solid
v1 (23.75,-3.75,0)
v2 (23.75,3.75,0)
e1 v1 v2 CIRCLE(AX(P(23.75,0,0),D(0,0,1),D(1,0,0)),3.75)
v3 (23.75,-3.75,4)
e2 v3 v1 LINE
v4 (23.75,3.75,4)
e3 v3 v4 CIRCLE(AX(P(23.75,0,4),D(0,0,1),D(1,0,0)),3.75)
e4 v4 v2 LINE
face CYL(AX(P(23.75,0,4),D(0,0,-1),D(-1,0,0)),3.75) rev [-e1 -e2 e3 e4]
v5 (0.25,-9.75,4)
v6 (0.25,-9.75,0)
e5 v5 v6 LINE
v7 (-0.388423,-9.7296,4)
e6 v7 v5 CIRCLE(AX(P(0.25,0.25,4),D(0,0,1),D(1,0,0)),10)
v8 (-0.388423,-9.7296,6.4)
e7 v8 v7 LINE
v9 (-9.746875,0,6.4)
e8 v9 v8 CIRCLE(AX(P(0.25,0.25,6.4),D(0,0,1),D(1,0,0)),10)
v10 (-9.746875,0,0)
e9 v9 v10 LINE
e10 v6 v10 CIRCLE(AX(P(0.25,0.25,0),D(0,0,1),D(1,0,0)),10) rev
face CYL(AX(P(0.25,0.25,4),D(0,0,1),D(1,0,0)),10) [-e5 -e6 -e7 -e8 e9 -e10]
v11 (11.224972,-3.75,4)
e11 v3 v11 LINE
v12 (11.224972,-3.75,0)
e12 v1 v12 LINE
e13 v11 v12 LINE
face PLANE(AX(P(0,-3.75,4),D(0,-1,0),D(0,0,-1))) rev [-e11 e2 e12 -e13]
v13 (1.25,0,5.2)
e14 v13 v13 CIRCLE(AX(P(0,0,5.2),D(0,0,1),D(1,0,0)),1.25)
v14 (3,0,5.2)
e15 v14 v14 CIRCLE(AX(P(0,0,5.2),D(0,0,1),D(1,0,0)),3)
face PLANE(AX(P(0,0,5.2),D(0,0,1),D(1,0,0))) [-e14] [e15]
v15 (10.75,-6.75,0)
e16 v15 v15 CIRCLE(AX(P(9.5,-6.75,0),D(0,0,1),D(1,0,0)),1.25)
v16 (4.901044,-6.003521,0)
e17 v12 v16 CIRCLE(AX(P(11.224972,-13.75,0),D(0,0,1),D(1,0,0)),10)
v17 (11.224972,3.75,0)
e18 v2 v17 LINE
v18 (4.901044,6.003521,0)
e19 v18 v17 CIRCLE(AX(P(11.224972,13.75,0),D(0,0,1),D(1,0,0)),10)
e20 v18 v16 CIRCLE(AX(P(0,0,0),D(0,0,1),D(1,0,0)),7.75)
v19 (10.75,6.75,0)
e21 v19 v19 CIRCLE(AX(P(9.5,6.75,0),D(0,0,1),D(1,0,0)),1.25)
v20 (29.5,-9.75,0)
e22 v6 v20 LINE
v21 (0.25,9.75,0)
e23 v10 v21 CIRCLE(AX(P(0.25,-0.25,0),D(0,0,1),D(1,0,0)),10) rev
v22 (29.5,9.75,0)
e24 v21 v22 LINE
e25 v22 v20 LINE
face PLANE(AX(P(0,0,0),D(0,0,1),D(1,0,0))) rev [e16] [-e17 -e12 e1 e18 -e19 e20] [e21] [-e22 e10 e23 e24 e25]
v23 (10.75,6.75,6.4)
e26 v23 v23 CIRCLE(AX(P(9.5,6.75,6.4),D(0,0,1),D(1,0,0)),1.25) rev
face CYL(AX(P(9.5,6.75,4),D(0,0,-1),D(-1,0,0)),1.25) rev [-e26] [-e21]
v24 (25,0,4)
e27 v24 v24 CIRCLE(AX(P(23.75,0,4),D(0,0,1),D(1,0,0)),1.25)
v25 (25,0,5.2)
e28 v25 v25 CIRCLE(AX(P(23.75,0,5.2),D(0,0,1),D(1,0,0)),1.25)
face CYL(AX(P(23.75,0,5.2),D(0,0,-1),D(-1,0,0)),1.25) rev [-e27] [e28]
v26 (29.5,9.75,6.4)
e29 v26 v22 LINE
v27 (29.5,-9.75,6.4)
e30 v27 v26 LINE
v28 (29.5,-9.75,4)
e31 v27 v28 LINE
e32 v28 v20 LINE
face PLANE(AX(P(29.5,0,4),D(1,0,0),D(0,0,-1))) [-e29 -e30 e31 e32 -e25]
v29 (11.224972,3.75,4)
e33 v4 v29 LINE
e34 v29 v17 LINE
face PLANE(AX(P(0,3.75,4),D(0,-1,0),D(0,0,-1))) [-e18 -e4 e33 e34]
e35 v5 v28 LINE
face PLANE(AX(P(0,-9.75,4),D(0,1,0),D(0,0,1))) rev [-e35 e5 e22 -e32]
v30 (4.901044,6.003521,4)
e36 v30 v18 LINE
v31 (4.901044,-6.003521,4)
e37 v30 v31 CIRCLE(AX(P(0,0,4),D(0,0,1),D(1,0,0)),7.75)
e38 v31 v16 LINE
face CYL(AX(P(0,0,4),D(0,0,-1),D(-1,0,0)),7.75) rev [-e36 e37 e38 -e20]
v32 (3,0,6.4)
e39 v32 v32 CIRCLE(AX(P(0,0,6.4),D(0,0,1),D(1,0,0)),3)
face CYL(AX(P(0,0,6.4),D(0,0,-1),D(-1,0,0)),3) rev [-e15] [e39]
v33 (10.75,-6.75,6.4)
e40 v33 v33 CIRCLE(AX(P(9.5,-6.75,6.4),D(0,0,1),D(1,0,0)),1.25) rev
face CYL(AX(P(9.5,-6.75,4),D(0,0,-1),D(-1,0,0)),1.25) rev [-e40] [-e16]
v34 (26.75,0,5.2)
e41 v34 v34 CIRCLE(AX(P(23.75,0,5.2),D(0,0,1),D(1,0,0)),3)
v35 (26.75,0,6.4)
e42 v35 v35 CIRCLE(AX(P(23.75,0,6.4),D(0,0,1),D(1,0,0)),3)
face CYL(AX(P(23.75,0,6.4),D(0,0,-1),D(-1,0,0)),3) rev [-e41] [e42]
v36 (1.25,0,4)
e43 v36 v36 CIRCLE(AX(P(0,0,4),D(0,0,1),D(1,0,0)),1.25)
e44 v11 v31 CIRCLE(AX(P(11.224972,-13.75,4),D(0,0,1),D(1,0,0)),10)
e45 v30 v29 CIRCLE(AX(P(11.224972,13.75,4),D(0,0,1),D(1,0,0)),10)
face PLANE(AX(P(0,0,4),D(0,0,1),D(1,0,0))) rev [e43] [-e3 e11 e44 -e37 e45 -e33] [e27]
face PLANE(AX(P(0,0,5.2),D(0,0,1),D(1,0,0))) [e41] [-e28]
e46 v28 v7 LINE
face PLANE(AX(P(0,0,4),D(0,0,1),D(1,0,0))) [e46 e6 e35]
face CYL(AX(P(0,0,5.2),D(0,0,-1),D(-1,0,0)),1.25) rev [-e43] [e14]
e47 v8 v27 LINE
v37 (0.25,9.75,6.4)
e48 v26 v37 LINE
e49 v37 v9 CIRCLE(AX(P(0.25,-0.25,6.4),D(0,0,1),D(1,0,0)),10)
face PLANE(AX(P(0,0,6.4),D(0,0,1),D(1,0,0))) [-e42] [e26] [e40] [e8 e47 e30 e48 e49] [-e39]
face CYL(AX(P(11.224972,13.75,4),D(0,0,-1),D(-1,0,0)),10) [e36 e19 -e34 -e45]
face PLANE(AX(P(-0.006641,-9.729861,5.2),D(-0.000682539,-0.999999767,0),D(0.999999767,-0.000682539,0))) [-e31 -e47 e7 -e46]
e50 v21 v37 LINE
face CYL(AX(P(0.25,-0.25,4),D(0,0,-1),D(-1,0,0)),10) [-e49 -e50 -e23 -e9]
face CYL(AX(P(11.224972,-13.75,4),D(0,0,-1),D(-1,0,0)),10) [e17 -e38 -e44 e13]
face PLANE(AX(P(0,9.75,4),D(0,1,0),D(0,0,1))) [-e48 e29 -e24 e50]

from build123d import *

# Parameters (mm, degrees)
SKETCH1_R           = 1.25
BOSS_EXTRUDE4_DEPTH = 4
FILLET1_R           = 10
SKETCH2_R           = 1.25
BOSS_EXTRUDE5_DEPTH = 1.2
SKETCH3_R           = 3
SKETCH3_R_2         = 1.25
BOSS_EXTRUDE6_DEPTH = 1.2


with BuildPart() as part:
    # Sketch1 → Boss-Extrude4 (new body)
    with BuildSketch(Plane.XY):
        Polygon((-9.75, 9.75), (-9.75, 0), (-9.75, -9.75), (29.5, -9.75), (29.5, -6.75), (29.5, 6.75), (29.5, 9.75), align=None)
        with Locations((9.5, -6.75)):
            Circle(SKETCH1_R, mode=Mode.SUBTRACT)
        with Locations((9.5, 6.75)):
            Circle(SKETCH1_R, mode=Mode.SUBTRACT)
        with BuildLine():
            ThreePointArc((4.901044183, -6.003521127), (-3.322604971, -7.001628111), (-7.75, 0))
            ThreePointArc((-7.75, 0), (-3.322604971, 7.001628111), (4.901044183, 6.003521127))
            ThreePointArc((4.901044183, 6.003521127), (7.868246727, 4.330212616), (11.22497216, 3.75))
            Line((11.22497216, 3.75), (23.75, 3.75))
            ThreePointArc((23.75, 3.75), (26.401650429, 2.651650429), (27.5, 0))
            ThreePointArc((27.5, 0), (26.401650429, -2.651650429), (23.75, -3.75))
            Line((23.75, -3.75), (11.22497216, -3.75))
            ThreePointArc((11.22497216, -3.75), (7.868246727, -4.330212616), (4.901044183, -6.003521127))
        make_face(mode=Mode.SUBTRACT)
    extrude(amount=BOSS_EXTRUDE4_DEPTH)

    # Fillet1
    # the kernel refuses this fillet: 10 mm, written as the material it takes off along each edge
    with BuildSketch(Plane(origin=(-9.75, -9.75, -25), x_dir=(0, 1, 0), z_dir=(0, 0, 1))) as fillet1_piece_1:
        with BuildLine():
            CenterArc((FILLET1_R, -FILLET1_R), FILLET1_R, 90, 90)
            Line((0, -FILLET1_R), (0, 0))
            Line((0, 0), (FILLET1_R, 0))
        make_face()
    extrude(amount=54, mode=Mode.SUBTRACT)
    with BuildSketch(Plane(origin=(-9.75, 9.75, -25), x_dir=(0, -1, 0), z_dir=(0, 0, 1))) as fillet1_piece_2:
        with BuildLine():
            CenterArc((FILLET1_R, FILLET1_R), FILLET1_R, 180, 90)
            Line((0, FILLET1_R), (0, 0))
            Line((0, 0), (FILLET1_R, 0))
        make_face()
    extrude(amount=54, mode=Mode.SUBTRACT)

    # Sketch2 → Boss-Extrude5 (add)
    # profile 1 of 4: a face of its own
    with BuildSketch(Plane.XY.offset(4)):
        with BuildLine():
            ThreePointArc((8.882472313, 4.028236041), (5.388428188, 8.129565896), (0.25, 9.75))
            ThreePointArc((0.25, 9.75), (-6.732120022, 6.908910532), (-9.746874512, 0))
            ThreePointArc((-9.746874512, 0), (-6.957195545, -6.682267477), (-0.388423062, -9.729599992))
            Line((-0.388423062, -9.729599992), (0.667724562, -9.730320853))
            ThreePointArc((0.667724562, -9.730320853), (5.561475334, -8.012177738), (8.882472313, -4.028236041))
            ThreePointArc((8.882472313, -4.028236041), (6.780629621, -4.791885277), (4.901044183, -6.003521127))
            ThreePointArc((4.901044183, -6.003521127), (-7.75, 0), (4.901044183, 6.003521127))
            ThreePointArc((4.901044183, 6.003521127), (6.780629621, 4.791885277), (8.882472313, 4.028236041))
        make_face()
    # profile 2 of 4: a face of its own
    with BuildSketch(Plane.XY.offset(4)):
        with BuildLine():
            ThreePointArc((9.753204602, 0), (9.5330365, 2.060634631), (8.882472313, 4.028236041))
            ThreePointArc((8.882472313, 4.028236041), (6.780629621, 4.791885277), (4.901044183, 6.003521127))
            ThreePointArc((4.901044183, 6.003521127), (-7.75, 0), (4.901044183, -6.003521127))
            ThreePointArc((4.901044183, -6.003521127), (6.780629621, -4.791885277), (8.882472313, -4.028236041))
            ThreePointArc((8.882472313, -4.028236041), (9.5330365, -2.060634631), (9.753204602, 0))
        make_face()
        Circle(SKETCH2_R, mode=Mode.SUBTRACT)
    # profile 3 of 4: a face of its own
    with BuildSketch(Plane.XY.offset(4)):
        with BuildLine():
            Line((29.5, -9.75), (29.5, 9.75))
            Line((29.5, 9.75), (0.25, 9.75))
            ThreePointArc((0.25, 9.75), (5.388428188, 8.129565896), (8.882472313, 4.028236041))
            ThreePointArc((8.882472313, 4.028236041), (10.045489135, 3.819802631), (11.22497216, 3.75))
            Line((11.22497216, 3.75), (23.75, 3.75))
            ThreePointArc((23.75, 3.75), (27.5, 0), (23.75, -3.75))
            Line((23.75, -3.75), (11.22497216, -3.75))
            ThreePointArc((11.22497216, -3.75), (10.045489135, -3.819802631), (8.882472313, -4.028236041))
            ThreePointArc((8.882472313, -4.028236041), (5.561475334, -8.012177738), (0.667724562, -9.730320853))
            Line((0.667724562, -9.730320853), (29.5, -9.75))
        make_face()
        with Locations((9.5, -6.75)):
            Circle(SKETCH2_R, mode=Mode.SUBTRACT)
        with Locations((9.5, 6.75)):
            Circle(SKETCH2_R, mode=Mode.SUBTRACT)
    # profile 4 of 4: a face of its own
    with BuildSketch(Plane.XY.offset(4)):
        with BuildLine():
            ThreePointArc((11.22497216, 3.75), (10.045489135, 3.819802631), (8.882472313, 4.028236041))
            ThreePointArc((8.882472313, 4.028236041), (9.5330365, 2.060634631), (9.753204602, 0))
            ThreePointArc((9.753204602, 0), (9.5330365, -2.060634631), (8.882472313, -4.028236041))
            ThreePointArc((8.882472313, -4.028236041), (10.045489135, -3.819802631), (11.22497216, -3.75))
            Line((11.22497216, -3.75), (23.75, -3.75))
            ThreePointArc((23.75, -3.75), (27.5, 0), (23.75, 3.75))
            Line((23.75, 3.75), (11.22497216, 3.75))
        make_face()
        with Locations((23.75, 0)):
            Circle(SKETCH2_R, mode=Mode.SUBTRACT)
    extrude(amount=BOSS_EXTRUDE5_DEPTH)

    # Sketch3 → Boss-Extrude6 (add)
    # profile 1 of 2: a face of its own
    with BuildSketch(Plane.XY.offset(5.2)):
        with BuildLine():
            ThreePointArc((9.75, 0), (6.938066581, 6.850235917), (0.124208797, 9.749208797))
            ThreePointArc((0.124208797, 9.749208797), (-6.777009203, 6.864853594), (-9.746874512, 0))
            ThreePointArc((-9.746874512, 0), (-6.957195545, -6.682267477), (-0.388423062, -9.729599992))
            Line((-0.388423062, -9.729599992), (0.619672772, -9.730288056))
            ThreePointArc((0.619672772, -9.730288056), (7.110003851, -6.671607395), (9.75, 0))
        make_face()
        Circle(SKETCH3_R, mode=Mode.SUBTRACT)
    # profile 2 of 2: a face of its own
    with BuildSketch(Plane.XY.offset(5.2)):
        with BuildLine():
            Line((29.5, 9.75), (0.25, 9.75))
            ThreePointArc((0.25, 9.75), (0.187103155, 9.749802197), (0.124208797, 9.749208797))
            ThreePointArc((0.124208797, 9.749208797), (6.938066581, 6.850235917), (9.75, 0))
            ThreePointArc((9.75, 0), (7.110003851, -6.671607395), (0.619672772, -9.730288056))
            Line((0.619672772, -9.730288056), (29.5, -9.75))
            Line((29.5, -9.75), (29.5, 9.75))
        make_face()
        with Locations((9.5, -6.75)):
            Circle(SKETCH3_R_2, mode=Mode.SUBTRACT)
        with Locations((9.5, 6.75)):
            Circle(SKETCH3_R_2, mode=Mode.SUBTRACT)
        with Locations((23.75, 0)):
            Circle(SKETCH3_R, mode=Mode.SUBTRACT)
    extrude(amount=BOSS_EXTRUDE6_DEPTH)


solid = part.part
